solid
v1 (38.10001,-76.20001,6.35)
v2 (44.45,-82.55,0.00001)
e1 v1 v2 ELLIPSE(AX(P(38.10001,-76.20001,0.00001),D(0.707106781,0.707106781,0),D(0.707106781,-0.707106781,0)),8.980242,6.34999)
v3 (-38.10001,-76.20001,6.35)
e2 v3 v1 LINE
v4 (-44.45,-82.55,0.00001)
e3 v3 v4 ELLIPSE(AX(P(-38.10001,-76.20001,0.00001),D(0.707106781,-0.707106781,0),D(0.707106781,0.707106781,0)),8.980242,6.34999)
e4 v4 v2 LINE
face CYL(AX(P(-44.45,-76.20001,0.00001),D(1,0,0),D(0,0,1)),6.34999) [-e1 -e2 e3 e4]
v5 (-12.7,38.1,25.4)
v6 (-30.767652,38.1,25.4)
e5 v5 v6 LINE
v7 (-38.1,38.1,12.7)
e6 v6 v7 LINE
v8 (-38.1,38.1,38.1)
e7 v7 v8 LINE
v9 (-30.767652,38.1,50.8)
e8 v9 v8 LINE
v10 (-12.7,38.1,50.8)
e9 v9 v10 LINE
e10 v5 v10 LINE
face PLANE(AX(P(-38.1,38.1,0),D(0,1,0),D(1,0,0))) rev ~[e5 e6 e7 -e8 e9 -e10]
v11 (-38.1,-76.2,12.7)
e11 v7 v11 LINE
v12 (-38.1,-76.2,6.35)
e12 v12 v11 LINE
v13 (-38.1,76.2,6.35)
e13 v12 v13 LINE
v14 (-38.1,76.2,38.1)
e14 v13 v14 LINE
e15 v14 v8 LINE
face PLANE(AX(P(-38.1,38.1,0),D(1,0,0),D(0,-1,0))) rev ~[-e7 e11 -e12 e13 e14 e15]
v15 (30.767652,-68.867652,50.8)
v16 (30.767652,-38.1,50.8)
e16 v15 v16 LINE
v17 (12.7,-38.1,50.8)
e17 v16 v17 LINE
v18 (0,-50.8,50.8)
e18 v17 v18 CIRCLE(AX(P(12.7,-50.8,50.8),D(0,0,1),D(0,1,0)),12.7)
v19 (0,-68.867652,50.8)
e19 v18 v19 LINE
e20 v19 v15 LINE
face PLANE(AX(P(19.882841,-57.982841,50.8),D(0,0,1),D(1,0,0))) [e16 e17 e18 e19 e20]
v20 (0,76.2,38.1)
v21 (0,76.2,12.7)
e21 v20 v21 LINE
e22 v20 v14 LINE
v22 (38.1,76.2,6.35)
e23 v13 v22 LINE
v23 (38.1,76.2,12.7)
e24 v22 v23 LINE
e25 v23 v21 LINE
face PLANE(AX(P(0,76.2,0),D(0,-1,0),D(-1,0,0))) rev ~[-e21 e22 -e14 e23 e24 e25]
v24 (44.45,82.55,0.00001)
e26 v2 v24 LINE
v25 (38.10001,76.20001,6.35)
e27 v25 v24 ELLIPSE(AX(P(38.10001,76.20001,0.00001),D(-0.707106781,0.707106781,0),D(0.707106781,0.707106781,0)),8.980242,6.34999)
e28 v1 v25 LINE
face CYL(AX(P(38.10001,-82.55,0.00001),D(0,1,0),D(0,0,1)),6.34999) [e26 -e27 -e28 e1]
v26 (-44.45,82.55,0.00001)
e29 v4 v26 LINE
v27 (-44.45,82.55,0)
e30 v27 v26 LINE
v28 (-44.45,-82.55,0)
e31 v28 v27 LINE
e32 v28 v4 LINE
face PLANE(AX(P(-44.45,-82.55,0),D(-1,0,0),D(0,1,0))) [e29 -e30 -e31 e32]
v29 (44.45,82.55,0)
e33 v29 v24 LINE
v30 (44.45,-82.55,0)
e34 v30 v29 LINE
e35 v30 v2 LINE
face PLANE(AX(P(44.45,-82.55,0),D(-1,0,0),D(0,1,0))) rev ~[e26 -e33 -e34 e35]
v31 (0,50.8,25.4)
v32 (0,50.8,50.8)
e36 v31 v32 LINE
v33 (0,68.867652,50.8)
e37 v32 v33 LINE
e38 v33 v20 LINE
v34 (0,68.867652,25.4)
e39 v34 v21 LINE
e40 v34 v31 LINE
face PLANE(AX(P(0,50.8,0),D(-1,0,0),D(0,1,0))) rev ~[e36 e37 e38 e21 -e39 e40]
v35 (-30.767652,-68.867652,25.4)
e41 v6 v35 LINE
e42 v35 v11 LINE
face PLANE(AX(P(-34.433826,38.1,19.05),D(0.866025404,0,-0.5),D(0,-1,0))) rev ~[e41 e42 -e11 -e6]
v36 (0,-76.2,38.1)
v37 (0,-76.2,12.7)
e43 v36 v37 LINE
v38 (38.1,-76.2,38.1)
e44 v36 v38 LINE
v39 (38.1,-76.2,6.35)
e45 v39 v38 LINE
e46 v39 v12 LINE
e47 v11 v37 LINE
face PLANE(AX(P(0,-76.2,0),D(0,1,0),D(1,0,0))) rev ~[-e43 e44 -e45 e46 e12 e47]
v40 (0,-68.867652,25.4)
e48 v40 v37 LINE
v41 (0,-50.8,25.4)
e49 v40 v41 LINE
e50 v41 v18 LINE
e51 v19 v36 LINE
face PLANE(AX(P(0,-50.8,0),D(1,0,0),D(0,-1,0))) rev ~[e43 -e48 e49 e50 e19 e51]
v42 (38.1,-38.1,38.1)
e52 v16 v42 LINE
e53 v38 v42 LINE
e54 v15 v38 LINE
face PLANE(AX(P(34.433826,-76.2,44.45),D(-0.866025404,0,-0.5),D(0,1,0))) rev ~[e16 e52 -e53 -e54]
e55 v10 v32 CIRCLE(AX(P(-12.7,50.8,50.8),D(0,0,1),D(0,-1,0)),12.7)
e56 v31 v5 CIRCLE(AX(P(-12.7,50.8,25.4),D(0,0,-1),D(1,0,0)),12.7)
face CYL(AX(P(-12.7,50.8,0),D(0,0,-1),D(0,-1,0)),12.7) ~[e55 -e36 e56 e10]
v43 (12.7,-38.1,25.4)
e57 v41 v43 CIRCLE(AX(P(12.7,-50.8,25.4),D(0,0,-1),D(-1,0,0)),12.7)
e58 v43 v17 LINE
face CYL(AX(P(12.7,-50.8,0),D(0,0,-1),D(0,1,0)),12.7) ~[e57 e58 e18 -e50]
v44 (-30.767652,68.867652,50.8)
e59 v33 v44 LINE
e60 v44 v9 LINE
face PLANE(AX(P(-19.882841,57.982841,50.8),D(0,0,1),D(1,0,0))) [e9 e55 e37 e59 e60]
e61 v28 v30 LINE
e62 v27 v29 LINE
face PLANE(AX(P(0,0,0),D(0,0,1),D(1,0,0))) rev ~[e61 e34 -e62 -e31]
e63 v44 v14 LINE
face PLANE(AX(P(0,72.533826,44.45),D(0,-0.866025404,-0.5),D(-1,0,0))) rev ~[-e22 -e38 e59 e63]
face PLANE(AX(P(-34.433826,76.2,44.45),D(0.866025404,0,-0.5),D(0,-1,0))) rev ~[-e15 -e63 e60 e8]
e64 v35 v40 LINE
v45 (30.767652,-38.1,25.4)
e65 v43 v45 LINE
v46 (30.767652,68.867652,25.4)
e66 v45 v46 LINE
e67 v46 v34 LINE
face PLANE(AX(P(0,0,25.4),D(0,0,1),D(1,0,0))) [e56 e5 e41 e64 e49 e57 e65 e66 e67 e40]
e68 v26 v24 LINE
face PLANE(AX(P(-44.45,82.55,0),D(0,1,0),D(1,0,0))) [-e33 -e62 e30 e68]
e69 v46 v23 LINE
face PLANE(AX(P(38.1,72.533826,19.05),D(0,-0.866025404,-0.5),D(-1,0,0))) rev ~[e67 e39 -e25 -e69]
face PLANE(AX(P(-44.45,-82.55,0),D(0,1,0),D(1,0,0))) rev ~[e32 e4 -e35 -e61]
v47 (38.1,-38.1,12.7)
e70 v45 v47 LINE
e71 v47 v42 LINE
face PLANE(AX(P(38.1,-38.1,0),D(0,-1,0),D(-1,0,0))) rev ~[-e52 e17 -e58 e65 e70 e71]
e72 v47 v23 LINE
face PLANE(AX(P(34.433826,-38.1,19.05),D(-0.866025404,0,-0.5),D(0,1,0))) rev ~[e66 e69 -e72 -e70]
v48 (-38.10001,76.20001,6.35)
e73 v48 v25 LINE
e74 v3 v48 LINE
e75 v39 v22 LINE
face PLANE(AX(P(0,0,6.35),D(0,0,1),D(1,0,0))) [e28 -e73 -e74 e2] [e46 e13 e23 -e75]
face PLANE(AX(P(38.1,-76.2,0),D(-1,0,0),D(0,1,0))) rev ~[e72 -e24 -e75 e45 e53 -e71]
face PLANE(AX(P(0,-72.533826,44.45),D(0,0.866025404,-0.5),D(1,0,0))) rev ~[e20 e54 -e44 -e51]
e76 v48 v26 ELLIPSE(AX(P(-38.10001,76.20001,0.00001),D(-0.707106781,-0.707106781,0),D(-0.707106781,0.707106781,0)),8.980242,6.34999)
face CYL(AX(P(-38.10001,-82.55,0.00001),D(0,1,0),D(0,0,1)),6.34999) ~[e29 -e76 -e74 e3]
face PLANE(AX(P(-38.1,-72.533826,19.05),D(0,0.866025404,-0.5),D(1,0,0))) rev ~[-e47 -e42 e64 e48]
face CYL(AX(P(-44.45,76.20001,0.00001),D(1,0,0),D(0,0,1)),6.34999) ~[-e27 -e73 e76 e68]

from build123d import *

# Parameters (mm, degrees)
F0_W     = 88.9
F0_H     = 165.1
F1_DEPTH = 6.35
F2_DEPTH = 25.4
F3_DEPTH = 50.8
F4_R     = 6.34999
F5_SIZE2 = 12.7
F5_SIZE  = 7.3323484187
F6_SIZE2 = 12.7
F6_SIZE  = 7.3323484187
F7_SIZE2 = 12.7
F7_SIZE  = 7.3323484187


# Not quite as in the source:
# - a fillet or chamfer is up to 0.001 mm smaller than in the source, because OpenCascade refuses the exact size


with BuildPart() as f1:
    # F0 (on Top) → F1 (new body)
    with BuildSketch(Plane.XY):
        Rectangle(F0_W, F0_H)
        Polygon((0, 76.2), (38.1, 76.2), (38.1, -38.1), (38.1, -76.2), (0, -76.2), (-38.1, -76.2), (-38.1, 38.1), (-38.1, 76.2), align=None, mode=Mode.SUBTRACT)
    extrude(amount=F1_DEPTH)

    # F0 (on Top) → F2 (join)
    with BuildSketch(Plane.XY):
        with BuildLine():
            Line((38.1, -38.1), (38.1, 76.2))
            Line((38.1, 76.2), (0, 76.2))
            Line((0, 76.2), (0, 50.8))
            ThreePointArc((0, 50.8), (-3.7197438789, 41.8197438789), (-12.7, 38.1))
            Line((-12.7, 38.1), (-38.1, 38.1))
            Line((-38.1, 38.1), (-38.1, -76.2))
            Line((-38.1, -76.2), (0, -76.2))
            Line((0, -76.2), (0, -50.8))
            ThreePointArc((0, -50.8), (3.7197438789, -41.8197438789), (12.7, -38.1))
            Line((12.7, -38.1), (38.1, -38.1))
        make_face()
    extrude(amount=F2_DEPTH)

    # F0 (on Top) → F3 (join)
    with BuildSketch(Plane.XY):
        with BuildLine():
            Line((38.1, -76.2), (38.1, -38.1))
            Line((38.1, -38.1), (12.7, -38.1))
            ThreePointArc((12.7, -38.1), (3.7197438789, -41.8197438789), (0, -50.8))
            Line((0, -50.8), (0, -76.2))
            Line((0, -76.2), (38.1, -76.2))
        make_face()
        with BuildLine():
            Line((0, 50.8), (0, 76.2))
            Line((0, 76.2), (-38.1, 76.2))
            Line((-38.1, 76.2), (-38.1, 38.1))
            Line((-38.1, 38.1), (-12.7, 38.1))
            ThreePointArc((-12.7, 38.1), (-3.7197438789, 41.8197438789), (0, 50.8))
        make_face()
    extrude(amount=F3_DEPTH)

    # F4 (radius 6.35 in the source; OpenCascade refuses exactly that, so slightly less here)
    f4_edges = [f1.edges().sort_by_distance(p)[0] for p in [
        (0, -82.55, 6.35),
        (44.45, 0, 6.35),
        (-44.45, 0, 6.35),
        (0, 82.55, 6.35),
    ]]
    fillet(f4_edges, radius=F4_R)

    # F5
    f5_edges = [f1.edges().sort_by_distance(p)[0] for p in [
        (38.1, 19.05, 25.4),
        (19.05, 76.2, 25.4),
        (-38.1, -19.05, 25.4),
        (-19.05, -76.2, 25.4),
    ]]
    f5_side = f1.faces().sort_by_distance((0, 0, 25.4))[0]
    chamfer(f5_edges, length=F5_SIZE, length2=F5_SIZE2, reference=f5_side)

    # F6
    f6_edges = [f1.edges().sort_by_distance(p)[0] for p in [
        (38.1, -57.15, 50.8),
        (19.05, -76.2, 50.8),
    ]]
    f6_side = f1.faces().sort_by_distance((19.446042, -57.546042, 50.8))[0]
    chamfer(f6_edges, length=F6_SIZE, length2=F6_SIZE2, reference=f6_side)

    # F7
    f7_edges = [f1.edges().sort_by_distance(p)[0] for p in [
        (-19.05, 76.2, 50.8),
        (-38.1, 57.15, 50.8),
    ]]
    f7_side = f1.faces().sort_by_distance((-19.446042, 57.546042, 50.8))[0]
    chamfer(f7_edges, length=F7_SIZE, length2=F7_SIZE2, reference=f7_side)


solid = f1.part
